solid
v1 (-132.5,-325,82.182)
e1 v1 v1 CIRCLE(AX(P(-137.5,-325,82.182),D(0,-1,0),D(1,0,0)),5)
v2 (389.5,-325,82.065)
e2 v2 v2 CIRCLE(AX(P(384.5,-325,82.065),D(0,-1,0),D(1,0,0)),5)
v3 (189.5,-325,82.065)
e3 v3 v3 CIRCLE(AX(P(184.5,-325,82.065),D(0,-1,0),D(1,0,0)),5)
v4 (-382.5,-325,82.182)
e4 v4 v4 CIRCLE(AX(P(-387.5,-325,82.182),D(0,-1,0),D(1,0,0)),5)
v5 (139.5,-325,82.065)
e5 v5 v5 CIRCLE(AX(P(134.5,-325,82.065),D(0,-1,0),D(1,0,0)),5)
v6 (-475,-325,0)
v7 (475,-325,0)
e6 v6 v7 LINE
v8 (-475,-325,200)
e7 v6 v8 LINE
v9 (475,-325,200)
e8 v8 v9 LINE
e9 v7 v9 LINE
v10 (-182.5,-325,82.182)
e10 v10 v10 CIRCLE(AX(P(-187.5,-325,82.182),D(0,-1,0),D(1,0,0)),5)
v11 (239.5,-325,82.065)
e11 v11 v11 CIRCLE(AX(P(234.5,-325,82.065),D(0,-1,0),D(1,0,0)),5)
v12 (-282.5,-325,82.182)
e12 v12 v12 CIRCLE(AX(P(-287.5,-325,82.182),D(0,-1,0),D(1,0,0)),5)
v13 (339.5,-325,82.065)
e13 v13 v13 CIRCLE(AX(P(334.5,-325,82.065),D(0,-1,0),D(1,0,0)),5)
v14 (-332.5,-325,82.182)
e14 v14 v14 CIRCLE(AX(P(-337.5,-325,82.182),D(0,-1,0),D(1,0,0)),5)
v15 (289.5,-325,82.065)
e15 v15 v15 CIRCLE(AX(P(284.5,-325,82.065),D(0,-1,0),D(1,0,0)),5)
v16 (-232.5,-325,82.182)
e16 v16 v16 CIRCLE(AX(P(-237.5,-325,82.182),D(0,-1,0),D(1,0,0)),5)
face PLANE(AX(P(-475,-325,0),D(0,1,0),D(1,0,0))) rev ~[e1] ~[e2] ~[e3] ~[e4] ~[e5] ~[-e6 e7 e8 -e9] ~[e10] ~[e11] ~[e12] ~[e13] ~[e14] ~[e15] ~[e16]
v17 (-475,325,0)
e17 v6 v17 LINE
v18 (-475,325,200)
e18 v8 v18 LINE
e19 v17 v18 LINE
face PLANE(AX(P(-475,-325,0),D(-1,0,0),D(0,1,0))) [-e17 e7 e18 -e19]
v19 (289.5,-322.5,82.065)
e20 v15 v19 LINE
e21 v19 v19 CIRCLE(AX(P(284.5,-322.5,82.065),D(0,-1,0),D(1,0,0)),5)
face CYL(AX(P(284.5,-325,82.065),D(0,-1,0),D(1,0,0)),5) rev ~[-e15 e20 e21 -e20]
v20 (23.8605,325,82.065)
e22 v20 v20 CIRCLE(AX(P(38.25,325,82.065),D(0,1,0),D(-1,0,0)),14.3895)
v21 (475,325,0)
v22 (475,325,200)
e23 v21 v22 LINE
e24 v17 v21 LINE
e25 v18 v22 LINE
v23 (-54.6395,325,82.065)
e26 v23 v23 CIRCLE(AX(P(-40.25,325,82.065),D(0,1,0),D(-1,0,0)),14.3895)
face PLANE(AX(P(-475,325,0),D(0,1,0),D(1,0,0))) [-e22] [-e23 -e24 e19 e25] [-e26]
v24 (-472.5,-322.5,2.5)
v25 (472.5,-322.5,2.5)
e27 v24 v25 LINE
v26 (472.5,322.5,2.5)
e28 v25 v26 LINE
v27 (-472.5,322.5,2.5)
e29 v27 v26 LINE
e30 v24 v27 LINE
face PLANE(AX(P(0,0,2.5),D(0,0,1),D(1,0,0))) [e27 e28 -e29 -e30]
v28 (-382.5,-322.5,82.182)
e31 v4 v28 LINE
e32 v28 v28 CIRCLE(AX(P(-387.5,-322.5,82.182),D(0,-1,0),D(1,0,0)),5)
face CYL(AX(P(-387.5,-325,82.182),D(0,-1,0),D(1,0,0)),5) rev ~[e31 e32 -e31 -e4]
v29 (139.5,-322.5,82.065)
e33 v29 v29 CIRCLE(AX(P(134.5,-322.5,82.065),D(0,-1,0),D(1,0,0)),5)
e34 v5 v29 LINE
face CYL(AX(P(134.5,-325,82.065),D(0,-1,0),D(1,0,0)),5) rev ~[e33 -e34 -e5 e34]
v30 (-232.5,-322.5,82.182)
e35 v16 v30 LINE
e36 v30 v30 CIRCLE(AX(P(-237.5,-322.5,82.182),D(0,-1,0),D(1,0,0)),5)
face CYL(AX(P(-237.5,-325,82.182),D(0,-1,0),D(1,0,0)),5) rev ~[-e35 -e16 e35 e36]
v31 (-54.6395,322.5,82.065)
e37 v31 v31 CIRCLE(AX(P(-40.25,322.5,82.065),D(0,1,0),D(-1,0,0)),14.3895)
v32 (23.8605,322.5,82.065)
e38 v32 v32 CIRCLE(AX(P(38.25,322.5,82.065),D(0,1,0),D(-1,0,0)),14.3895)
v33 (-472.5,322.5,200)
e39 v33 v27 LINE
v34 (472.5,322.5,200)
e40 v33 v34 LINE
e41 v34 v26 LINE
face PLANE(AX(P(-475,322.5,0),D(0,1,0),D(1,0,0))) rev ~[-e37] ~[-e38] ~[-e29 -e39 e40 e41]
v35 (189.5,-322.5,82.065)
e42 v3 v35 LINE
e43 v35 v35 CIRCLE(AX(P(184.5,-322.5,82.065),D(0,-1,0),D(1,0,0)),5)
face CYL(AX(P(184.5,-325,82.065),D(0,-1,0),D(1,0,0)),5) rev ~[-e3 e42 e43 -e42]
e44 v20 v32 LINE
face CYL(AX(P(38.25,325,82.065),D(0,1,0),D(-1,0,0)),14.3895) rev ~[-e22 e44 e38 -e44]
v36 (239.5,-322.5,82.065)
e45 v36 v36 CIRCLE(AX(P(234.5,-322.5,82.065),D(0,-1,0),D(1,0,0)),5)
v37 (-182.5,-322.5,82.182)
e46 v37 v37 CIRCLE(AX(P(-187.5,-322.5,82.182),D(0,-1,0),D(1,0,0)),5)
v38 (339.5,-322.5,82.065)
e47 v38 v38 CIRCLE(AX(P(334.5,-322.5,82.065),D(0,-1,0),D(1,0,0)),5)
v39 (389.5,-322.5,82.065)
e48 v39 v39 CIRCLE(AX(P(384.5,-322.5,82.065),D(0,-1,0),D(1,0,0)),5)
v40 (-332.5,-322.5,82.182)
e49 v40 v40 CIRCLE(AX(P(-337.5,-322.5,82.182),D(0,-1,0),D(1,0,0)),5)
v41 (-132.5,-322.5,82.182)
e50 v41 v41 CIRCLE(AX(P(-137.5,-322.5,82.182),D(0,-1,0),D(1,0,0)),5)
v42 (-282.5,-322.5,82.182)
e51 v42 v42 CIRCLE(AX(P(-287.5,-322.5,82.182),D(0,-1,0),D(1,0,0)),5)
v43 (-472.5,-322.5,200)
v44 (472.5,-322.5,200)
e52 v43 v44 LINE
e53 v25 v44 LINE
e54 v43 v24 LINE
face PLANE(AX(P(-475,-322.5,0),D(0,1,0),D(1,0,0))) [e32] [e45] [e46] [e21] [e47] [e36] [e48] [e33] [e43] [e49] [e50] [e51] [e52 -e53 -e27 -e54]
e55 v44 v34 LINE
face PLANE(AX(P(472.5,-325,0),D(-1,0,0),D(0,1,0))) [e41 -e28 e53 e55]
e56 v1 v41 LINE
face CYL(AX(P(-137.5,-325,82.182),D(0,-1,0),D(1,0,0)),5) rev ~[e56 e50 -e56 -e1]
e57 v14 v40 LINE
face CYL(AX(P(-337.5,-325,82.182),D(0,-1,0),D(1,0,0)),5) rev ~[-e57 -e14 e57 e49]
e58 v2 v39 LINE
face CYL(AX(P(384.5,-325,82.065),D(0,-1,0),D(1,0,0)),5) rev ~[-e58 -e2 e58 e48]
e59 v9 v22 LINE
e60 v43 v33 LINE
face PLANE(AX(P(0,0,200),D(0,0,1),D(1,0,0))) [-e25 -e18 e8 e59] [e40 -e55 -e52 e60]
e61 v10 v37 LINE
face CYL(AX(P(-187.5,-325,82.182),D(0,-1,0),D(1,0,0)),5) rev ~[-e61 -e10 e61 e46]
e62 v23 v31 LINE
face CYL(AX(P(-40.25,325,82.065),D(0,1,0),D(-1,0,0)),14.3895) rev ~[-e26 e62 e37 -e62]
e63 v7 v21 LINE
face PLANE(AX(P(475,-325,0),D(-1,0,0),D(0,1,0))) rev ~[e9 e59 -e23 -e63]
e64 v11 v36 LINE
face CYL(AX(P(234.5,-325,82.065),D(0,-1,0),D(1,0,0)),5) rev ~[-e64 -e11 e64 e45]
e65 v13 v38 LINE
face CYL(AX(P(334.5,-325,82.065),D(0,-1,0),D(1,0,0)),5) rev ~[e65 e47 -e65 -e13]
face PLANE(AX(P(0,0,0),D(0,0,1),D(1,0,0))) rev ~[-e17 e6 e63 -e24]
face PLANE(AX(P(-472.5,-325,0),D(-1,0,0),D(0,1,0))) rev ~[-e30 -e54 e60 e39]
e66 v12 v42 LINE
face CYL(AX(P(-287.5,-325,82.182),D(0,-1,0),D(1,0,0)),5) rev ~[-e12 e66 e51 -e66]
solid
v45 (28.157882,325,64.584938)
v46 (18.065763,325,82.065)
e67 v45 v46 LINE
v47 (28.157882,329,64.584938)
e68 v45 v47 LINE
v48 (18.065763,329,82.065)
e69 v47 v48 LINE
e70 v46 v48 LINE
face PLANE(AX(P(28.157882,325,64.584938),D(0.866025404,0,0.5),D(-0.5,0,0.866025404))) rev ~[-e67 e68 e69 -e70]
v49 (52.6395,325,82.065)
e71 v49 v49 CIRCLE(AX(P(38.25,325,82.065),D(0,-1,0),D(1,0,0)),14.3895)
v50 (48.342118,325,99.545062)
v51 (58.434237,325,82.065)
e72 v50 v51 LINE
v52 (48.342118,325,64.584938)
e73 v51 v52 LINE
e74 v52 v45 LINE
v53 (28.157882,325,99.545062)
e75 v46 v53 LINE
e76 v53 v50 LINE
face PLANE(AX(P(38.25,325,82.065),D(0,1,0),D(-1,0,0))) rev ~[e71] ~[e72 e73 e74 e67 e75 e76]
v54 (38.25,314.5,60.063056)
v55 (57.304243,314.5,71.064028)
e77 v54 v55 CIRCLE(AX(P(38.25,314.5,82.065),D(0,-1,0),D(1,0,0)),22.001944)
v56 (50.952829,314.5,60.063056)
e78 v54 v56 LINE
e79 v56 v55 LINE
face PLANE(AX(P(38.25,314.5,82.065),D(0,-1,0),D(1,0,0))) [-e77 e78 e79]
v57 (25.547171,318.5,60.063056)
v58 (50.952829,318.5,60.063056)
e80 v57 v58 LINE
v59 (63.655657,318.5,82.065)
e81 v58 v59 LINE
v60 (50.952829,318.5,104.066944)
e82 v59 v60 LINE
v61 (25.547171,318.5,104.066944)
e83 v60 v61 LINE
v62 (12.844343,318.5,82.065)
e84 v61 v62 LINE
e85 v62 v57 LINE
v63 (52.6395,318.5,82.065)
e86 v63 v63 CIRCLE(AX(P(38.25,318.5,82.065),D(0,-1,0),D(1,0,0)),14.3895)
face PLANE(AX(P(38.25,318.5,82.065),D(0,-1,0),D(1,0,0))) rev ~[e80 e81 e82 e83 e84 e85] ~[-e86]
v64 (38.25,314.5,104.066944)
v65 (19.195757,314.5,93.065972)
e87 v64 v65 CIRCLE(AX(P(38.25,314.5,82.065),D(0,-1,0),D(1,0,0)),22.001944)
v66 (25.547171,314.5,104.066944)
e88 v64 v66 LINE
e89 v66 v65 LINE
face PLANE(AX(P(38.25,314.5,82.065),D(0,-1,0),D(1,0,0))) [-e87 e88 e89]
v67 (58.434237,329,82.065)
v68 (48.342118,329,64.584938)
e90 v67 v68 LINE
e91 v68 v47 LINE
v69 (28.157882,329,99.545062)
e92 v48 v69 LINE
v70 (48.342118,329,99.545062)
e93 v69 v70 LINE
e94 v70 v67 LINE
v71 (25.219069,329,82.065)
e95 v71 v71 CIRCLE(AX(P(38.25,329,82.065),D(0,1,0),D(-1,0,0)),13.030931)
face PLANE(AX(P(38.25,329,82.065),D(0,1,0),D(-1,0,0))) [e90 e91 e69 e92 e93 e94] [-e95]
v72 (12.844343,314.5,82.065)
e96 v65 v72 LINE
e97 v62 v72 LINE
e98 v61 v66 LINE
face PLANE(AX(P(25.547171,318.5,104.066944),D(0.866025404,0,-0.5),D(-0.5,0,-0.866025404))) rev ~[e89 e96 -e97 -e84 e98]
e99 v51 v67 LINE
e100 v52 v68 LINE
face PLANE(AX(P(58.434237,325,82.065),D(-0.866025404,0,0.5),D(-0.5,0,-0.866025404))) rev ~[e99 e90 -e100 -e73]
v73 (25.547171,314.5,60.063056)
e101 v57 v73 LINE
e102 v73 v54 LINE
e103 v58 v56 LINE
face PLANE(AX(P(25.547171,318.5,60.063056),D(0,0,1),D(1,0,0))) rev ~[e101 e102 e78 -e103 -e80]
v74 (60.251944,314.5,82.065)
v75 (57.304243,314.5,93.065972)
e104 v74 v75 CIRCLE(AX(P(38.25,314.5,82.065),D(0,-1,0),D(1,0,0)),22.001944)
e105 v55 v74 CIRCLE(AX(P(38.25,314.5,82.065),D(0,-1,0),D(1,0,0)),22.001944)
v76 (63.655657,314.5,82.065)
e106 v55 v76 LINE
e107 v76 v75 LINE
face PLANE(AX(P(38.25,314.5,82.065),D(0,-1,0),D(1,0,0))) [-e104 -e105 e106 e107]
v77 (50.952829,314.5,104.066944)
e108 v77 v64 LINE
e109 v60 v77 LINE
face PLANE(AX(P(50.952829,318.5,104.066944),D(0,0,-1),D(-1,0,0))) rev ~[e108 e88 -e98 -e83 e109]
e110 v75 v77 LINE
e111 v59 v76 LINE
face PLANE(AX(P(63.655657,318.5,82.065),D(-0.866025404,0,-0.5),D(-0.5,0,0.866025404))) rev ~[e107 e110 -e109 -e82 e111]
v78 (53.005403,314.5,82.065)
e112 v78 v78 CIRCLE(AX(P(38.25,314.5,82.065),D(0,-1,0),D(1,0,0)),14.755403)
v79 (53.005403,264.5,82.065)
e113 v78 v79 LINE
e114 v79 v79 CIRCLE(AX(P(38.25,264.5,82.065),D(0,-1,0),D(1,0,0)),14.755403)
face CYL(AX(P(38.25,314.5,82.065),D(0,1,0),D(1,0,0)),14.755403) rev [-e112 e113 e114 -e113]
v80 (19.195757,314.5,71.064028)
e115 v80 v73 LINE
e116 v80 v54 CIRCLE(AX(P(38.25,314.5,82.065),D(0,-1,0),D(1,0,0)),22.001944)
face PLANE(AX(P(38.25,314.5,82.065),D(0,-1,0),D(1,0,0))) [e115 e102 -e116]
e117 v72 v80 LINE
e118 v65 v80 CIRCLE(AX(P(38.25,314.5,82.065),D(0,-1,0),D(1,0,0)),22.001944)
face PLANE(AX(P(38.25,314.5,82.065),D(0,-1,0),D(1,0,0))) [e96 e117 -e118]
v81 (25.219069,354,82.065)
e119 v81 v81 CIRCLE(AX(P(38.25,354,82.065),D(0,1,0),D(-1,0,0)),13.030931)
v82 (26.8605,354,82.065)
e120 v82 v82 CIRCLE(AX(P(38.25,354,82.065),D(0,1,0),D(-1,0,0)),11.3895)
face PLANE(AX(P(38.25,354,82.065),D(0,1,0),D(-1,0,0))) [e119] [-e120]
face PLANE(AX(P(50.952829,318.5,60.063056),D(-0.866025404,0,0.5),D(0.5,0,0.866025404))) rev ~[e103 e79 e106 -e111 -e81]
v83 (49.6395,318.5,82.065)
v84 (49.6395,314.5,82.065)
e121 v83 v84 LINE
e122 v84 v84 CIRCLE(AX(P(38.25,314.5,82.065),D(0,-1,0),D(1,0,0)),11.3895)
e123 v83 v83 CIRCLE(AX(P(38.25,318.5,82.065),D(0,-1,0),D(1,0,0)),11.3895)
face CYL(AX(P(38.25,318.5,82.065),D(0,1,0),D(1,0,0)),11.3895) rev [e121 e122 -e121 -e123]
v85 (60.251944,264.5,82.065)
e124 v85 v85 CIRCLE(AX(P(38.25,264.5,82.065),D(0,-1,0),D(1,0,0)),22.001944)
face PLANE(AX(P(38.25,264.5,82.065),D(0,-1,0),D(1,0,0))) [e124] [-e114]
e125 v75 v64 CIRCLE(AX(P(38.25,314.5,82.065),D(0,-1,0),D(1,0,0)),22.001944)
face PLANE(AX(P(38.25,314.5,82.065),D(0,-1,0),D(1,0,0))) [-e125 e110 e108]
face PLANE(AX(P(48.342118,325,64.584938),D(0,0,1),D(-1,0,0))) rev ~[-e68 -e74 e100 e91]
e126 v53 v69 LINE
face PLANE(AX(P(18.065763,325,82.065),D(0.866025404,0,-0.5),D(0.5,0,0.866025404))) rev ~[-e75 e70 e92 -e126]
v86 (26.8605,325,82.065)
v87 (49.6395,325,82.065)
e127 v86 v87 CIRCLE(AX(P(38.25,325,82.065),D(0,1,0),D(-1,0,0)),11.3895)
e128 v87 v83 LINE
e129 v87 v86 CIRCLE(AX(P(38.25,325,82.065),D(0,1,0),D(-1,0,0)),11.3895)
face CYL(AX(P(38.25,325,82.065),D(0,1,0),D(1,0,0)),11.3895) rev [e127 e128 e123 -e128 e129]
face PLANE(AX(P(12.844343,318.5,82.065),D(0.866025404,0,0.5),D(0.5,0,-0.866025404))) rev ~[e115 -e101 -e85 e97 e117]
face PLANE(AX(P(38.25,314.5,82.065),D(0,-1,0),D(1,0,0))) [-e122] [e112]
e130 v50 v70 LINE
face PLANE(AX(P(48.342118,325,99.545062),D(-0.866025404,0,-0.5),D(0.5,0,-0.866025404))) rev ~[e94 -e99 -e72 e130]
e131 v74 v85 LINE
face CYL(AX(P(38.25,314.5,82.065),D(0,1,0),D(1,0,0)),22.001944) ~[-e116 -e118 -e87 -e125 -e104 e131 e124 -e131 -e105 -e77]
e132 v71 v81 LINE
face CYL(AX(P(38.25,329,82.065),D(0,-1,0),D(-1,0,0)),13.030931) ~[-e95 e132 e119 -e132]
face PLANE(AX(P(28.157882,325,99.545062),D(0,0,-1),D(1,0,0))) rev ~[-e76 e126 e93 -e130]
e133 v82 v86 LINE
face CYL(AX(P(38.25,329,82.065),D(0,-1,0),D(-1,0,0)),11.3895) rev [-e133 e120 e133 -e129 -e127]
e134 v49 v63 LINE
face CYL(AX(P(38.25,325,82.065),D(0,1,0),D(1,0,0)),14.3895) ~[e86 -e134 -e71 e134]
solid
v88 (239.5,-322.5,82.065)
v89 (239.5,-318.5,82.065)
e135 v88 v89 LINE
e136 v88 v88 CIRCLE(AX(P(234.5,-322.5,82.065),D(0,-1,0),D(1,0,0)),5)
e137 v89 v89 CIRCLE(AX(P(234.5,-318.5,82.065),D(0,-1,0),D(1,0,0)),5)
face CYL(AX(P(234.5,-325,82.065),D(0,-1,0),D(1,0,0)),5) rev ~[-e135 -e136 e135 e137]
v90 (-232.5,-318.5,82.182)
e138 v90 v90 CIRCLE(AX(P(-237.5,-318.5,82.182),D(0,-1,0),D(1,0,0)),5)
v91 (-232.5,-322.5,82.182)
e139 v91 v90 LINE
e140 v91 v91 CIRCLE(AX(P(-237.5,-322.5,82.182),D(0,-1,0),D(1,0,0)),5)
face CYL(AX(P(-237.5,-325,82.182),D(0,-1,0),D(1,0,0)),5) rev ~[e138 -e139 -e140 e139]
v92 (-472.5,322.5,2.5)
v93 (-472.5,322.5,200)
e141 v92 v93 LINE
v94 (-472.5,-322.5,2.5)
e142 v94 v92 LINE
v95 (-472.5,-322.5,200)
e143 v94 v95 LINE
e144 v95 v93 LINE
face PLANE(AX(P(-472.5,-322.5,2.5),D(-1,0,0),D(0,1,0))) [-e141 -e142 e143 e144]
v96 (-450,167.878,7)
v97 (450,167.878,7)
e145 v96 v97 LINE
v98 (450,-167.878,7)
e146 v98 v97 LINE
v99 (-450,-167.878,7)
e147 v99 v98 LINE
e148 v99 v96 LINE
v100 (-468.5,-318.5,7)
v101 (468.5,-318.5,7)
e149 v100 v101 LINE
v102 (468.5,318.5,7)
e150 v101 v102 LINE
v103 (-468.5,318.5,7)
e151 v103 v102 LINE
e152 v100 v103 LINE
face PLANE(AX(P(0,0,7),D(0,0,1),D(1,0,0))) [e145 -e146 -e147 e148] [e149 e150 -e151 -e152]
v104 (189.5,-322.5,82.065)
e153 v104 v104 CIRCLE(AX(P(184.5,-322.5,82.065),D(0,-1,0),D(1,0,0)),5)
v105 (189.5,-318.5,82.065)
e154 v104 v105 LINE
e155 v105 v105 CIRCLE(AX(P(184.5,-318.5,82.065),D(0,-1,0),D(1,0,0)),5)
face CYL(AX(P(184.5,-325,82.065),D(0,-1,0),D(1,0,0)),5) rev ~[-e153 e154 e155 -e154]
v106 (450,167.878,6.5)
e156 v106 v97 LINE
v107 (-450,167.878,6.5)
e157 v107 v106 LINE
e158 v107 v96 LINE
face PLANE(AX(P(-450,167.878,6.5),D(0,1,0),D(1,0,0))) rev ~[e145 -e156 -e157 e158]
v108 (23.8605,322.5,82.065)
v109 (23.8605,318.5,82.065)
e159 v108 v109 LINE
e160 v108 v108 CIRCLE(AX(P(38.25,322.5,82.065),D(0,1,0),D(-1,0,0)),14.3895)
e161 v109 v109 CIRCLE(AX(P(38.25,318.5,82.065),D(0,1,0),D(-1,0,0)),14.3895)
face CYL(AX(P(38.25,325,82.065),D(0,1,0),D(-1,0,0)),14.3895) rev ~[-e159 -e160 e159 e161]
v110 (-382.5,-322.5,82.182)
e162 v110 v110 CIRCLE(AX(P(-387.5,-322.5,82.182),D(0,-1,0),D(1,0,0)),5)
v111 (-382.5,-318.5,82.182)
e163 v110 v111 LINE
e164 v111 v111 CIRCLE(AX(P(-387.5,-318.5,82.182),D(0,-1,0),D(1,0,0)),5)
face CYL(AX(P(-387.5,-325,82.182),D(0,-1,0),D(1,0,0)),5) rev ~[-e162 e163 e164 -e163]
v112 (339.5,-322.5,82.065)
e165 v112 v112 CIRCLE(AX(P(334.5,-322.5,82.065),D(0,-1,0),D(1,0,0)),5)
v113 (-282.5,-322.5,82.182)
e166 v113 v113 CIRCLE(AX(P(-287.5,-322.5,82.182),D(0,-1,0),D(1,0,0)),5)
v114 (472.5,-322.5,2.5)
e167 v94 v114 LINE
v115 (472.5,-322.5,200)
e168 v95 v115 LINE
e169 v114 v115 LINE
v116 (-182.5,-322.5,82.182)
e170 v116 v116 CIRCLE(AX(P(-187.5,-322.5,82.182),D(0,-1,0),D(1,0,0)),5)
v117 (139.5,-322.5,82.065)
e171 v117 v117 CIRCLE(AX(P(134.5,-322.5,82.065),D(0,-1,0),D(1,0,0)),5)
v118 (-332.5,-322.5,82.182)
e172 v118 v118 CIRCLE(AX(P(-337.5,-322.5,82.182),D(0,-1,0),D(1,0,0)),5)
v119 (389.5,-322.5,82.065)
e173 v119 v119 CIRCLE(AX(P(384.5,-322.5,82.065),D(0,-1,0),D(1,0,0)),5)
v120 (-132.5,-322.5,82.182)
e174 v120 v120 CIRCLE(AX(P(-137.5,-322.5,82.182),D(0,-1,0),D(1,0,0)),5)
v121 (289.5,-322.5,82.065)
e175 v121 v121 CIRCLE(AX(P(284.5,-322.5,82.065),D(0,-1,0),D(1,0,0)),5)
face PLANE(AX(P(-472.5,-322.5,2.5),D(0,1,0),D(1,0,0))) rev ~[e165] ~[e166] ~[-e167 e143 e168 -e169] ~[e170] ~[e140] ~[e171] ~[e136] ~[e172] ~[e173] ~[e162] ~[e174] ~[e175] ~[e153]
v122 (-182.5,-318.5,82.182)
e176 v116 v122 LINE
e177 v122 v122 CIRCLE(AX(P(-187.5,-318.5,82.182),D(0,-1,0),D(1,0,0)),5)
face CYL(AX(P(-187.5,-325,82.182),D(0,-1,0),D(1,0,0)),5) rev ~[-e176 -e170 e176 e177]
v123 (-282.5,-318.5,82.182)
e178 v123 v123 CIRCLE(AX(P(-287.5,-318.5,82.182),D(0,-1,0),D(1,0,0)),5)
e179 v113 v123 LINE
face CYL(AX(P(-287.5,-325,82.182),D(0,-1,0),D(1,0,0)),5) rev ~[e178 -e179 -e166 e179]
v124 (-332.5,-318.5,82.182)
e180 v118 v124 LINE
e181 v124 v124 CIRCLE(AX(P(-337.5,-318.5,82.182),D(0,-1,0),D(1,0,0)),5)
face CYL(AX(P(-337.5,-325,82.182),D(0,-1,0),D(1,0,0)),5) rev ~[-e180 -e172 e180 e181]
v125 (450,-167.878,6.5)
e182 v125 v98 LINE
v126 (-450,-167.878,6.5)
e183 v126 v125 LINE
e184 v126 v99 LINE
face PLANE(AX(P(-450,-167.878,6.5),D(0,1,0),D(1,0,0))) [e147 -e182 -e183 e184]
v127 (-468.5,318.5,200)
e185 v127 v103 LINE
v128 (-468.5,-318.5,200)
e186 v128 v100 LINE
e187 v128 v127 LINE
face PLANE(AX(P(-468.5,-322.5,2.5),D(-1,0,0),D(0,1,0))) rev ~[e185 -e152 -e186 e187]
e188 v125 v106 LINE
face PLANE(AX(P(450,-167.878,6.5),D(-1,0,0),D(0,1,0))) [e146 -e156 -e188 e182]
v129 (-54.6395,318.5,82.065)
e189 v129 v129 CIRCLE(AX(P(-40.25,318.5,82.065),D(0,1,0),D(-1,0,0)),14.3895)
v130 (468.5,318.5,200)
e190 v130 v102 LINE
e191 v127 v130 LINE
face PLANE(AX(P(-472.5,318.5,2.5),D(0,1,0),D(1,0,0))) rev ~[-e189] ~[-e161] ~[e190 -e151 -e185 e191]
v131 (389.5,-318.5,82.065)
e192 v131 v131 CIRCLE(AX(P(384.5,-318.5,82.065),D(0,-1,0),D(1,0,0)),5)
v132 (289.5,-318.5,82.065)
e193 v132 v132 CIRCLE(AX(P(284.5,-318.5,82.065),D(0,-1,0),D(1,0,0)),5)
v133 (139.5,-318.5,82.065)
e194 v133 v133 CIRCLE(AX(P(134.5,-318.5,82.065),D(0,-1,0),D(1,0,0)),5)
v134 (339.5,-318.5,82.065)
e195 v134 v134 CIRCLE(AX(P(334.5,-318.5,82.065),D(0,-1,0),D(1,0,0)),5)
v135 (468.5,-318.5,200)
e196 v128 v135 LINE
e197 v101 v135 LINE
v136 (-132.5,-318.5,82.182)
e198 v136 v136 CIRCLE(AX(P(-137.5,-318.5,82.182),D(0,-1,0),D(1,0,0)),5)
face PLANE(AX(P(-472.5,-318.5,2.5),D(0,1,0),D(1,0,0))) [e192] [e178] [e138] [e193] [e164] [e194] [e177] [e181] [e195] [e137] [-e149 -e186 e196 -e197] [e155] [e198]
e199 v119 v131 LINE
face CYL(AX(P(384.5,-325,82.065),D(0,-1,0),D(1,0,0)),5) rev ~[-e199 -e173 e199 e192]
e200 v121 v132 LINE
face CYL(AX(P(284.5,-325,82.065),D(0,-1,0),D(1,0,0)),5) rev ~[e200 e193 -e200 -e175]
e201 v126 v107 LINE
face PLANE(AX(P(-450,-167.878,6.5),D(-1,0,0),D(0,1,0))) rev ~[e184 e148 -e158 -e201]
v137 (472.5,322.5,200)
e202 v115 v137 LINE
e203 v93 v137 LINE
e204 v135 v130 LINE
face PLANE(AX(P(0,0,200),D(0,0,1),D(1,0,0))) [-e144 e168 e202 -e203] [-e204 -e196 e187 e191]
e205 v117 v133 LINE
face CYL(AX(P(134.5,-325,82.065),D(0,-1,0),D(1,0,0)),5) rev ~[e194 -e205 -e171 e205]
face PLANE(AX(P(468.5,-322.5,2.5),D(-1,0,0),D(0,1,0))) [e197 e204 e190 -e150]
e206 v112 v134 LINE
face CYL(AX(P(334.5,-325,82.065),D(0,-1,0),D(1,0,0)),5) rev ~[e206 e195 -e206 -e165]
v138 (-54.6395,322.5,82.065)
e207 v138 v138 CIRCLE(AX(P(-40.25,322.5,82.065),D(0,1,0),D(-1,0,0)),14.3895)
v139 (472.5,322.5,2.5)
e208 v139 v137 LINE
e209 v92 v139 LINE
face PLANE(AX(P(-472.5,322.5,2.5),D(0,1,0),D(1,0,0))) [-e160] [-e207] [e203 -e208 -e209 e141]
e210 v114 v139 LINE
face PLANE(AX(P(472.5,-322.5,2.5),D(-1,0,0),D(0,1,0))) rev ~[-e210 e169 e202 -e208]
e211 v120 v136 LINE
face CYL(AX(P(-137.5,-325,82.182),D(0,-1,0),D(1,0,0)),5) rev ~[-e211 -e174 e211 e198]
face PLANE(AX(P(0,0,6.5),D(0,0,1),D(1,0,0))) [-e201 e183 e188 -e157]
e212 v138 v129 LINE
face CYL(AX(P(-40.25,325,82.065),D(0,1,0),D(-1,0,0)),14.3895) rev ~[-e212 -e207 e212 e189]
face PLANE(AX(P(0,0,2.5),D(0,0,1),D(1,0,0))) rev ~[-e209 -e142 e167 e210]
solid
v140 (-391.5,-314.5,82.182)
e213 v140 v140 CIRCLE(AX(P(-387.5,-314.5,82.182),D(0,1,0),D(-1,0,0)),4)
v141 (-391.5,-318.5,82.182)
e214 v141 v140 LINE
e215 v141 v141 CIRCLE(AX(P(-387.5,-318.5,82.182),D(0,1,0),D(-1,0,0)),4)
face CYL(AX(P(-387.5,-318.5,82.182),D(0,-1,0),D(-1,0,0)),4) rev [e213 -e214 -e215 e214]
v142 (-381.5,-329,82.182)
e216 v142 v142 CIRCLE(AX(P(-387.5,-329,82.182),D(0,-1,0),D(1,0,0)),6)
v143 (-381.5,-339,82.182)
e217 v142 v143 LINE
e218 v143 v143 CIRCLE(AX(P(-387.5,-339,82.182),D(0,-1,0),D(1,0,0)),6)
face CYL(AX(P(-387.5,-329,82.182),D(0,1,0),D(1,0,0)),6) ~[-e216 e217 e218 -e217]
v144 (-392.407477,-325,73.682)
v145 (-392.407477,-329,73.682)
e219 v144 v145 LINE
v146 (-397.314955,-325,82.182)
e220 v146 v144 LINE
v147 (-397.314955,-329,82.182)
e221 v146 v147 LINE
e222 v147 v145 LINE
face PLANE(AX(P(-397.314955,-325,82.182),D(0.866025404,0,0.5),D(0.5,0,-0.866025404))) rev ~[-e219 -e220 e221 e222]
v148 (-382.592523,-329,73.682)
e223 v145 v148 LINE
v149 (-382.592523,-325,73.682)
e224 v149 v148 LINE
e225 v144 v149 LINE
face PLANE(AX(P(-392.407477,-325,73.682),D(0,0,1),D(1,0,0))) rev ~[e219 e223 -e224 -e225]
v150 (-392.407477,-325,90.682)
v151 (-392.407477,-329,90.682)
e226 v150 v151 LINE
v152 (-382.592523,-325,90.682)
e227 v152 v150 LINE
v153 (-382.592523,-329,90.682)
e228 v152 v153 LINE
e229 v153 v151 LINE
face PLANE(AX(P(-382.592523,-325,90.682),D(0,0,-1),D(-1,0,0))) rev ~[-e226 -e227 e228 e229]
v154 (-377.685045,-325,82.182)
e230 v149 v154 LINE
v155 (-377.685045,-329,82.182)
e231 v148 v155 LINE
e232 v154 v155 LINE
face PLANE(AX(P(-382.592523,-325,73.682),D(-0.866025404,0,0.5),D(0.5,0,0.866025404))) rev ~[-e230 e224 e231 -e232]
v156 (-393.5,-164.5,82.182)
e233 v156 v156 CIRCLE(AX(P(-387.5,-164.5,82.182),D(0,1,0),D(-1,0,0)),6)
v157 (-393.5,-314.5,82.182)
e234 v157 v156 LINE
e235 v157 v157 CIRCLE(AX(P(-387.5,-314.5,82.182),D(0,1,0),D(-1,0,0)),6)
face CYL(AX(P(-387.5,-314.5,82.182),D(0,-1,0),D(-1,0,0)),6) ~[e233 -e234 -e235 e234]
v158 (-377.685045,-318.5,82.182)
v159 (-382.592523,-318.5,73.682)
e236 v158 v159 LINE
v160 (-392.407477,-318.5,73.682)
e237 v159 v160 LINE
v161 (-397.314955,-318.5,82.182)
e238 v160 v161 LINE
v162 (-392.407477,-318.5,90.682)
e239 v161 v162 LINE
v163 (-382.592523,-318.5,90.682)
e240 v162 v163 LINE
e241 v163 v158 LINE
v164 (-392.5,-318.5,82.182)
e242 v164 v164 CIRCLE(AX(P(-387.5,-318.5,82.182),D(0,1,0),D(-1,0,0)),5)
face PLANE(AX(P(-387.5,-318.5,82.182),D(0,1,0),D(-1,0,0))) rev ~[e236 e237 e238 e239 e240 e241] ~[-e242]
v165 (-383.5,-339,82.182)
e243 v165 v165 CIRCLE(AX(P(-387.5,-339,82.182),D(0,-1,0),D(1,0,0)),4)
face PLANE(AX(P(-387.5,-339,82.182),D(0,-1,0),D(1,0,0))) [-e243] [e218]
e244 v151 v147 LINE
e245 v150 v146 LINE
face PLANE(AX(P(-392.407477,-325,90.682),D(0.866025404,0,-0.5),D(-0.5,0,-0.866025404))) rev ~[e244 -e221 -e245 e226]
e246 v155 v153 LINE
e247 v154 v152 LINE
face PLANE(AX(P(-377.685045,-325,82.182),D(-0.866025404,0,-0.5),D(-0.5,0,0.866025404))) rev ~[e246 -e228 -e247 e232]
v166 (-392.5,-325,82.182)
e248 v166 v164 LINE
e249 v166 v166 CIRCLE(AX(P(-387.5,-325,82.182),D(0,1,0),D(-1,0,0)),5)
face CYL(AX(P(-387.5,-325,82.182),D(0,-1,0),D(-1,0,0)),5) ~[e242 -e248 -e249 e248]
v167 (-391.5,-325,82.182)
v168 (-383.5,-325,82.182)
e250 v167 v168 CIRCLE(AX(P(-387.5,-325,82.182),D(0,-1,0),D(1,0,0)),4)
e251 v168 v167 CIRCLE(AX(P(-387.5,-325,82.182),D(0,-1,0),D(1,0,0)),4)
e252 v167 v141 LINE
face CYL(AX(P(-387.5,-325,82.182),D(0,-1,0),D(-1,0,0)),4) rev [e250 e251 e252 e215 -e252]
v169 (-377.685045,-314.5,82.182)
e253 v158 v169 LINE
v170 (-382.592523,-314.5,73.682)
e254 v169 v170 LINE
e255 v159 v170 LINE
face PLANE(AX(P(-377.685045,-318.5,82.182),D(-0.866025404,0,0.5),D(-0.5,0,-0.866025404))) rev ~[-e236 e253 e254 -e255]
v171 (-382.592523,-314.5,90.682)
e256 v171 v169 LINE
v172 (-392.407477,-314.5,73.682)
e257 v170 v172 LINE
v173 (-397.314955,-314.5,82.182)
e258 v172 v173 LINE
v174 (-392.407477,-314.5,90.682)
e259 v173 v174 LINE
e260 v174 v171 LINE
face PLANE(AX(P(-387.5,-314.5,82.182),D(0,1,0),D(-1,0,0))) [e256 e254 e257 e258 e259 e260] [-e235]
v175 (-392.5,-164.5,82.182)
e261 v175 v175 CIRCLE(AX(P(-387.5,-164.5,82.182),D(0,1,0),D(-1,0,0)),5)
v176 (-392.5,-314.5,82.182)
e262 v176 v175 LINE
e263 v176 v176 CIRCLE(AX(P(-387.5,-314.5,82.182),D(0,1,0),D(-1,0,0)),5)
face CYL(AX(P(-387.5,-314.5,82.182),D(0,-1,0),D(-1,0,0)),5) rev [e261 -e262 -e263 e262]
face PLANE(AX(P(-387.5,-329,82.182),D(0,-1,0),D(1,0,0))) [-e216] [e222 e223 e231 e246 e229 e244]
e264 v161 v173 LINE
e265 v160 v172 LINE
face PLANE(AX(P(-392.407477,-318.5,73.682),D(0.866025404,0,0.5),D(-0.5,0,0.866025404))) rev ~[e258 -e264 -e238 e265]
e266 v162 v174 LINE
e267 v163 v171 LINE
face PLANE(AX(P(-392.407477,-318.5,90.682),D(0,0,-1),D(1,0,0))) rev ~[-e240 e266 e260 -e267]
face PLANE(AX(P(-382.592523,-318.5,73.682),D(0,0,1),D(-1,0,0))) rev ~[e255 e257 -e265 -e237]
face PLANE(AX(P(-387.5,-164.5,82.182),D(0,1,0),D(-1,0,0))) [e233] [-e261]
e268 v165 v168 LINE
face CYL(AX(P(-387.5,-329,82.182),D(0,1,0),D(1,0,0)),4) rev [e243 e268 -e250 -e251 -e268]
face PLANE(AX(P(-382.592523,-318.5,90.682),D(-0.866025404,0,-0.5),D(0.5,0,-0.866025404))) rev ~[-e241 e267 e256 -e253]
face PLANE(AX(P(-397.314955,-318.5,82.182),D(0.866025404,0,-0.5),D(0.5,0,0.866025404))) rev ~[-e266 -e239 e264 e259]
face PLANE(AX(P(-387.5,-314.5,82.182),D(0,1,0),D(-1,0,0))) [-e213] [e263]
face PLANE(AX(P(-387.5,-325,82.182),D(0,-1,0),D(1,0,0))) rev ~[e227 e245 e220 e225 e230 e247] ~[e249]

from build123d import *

# Parameters (mm, degrees)
F0_W      = 950
F0_H      = 650
F1_DEPTH  = 200
F2_T      = -2.5
F3_DEPTH  = 197.5
F4_T      = -4
F5_W      = 937
F5_H      = 637
F5_W_2    = 900
F5_H_2    = 335.756
F6_DEPTH  = 0.5
F7_R      = 5
F8_DEPTH  = 25
F9_R      = 14.3895
F10_DEPTH = 15
F11_R     = 4
F12_DEPTH = 4
F13_R     = 6
F13_R_2   = 4
F14_DEPTH = 10
F15_R     = 5
F15_R_2   = 4
F16_DEPTH = 6.5
F17_R     = 5
F17_R_2   = 4
F18_DEPTH = 4
F19_R     = 6
F19_R_2   = 5
F20_DEPTH = 150
F21_R     = 11.3895
F22_DEPTH = 4
F23_R     = 13.0309314184
F23_R_2   = 11.3895
F24_DEPTH = 25
F25_R     = 14.3895
F25_R_2   = 11.3895
F26_DEPTH = 6.5
F27_R     = 11.3895
F28_DEPTH = 4
F29_R     = 22.0019443752
F29_R_2   = 14.7554030698
F30_DEPTH = 50


# Not quite as in the source:
# - a feature names something its author has since deleted; it is built from what else it names


with BuildPart() as f1:
    # F0 (on Top) → F1 (new body)
    with BuildSketch(Plane.XY):
        Rectangle(F0_W, F0_H)
    extrude(amount=F1_DEPTH)

    # F2
    f2_openings = [f1.faces().sort_by_distance(p)[0] for p in [
        (0, 0, 200),
    ]]
    offset(amount=F2_T, openings=f2_openings)


with BuildPart() as f3:
    # F3 (new): a face of the model
    f3_faces = [f1.part.faces().sort_by_distance(p)[0] for p in [
        (0, 0, 2.5),
    ]]
    extrude(f3_faces, amount=F3_DEPTH)

    # F4
    f4_openings = [f3.faces().sort_by_distance(p)[0] for p in [
        (0, 0, 200),
    ]]
    offset(amount=F4_T, openings=f4_openings)

    # F5 (on face) → F6 (join)
    with BuildSketch(Plane.XY.offset(6.5)):
        Rectangle(F5_W, F5_H)
        Rectangle(F5_W_2, F5_H_2, mode=Mode.SUBTRACT)
    extrude(amount=F6_DEPTH)


with BuildPart() as f8_tool:
    # F7 (on face) → F8 (new body)
    with BuildSketch(Plane.XZ.offset(325)):
        with Locations((-387.5, 82.182)):
            Circle(F7_R)
        with Locations((-337.5, 82.182)):
            Circle(F7_R)
        with Locations((-287.5, 82.182)):
            Circle(F7_R)
        with Locations((-237.5, 82.182)):
            Circle(F7_R)
        with Locations((-187.5, 82.182)):
            Circle(F7_R)
        with Locations((-137.5, 82.182)):
            Circle(F7_R)
        with Locations((384.5, 82.065)):
            Circle(F7_R)
        with Locations((334.5, 82.065)):
            Circle(F7_R)
        with Locations((284.5, 82.065)):
            Circle(F7_R)
        with Locations((234.5, 82.065)):
            Circle(F7_R)
        with Locations((184.5, 82.065)):
            Circle(F7_R)
        with Locations((134.5, 82.065)):
            Circle(F7_R)
    extrude(amount=-F8_DEPTH)


with BuildPart() as f1_1:
    add(f1.part)

    # F8: cut by f8_tool
    add(f8_tool.part, mode=Mode.SUBTRACT)


with BuildPart() as f3_1:
    add(f3.part)

    # F8: cut by f8_tool
    add(f8_tool.part, mode=Mode.SUBTRACT)


with BuildPart() as f10_tool:
    # F9 (on face) → F10 (new body)
    with BuildSketch(Plane(origin=(0, 325, 0), x_dir=(-1, 0, 0), z_dir=(0, 1, 0))):
        with Locations((40.25, 82.065)):
            Circle(F9_R)
        with Locations((-38.25, 82.065)):
            Circle(F9_R)
    extrude(amount=-F10_DEPTH)


with BuildPart() as f1_2:
    add(f1_1.part)

    # F10: cut by f10_tool
    add(f10_tool.part, mode=Mode.SUBTRACT)


with BuildPart() as f3_2:
    add(f3_1.part)

    # F10: cut by f10_tool
    add(f10_tool.part, mode=Mode.SUBTRACT)


with BuildPart() as f12:
    # F11 (on face) → F12 (new body)
    with BuildSketch(Plane.XZ.offset(325)):
        Polygon((-382.5925227119, 90.682), (-392.4074772881, 90.682), (-397.3149545762, 82.182), (-392.4074772881, 73.682), (-382.5925227119, 73.682), (-377.6850454238, 82.182), align=None)
        with Locations((-387.5, 82.182)):
            Circle(F11_R, mode=Mode.SUBTRACT)
    extrude(amount=F12_DEPTH)

    # F13 (on face) → F14 (join)
    with BuildSketch(Plane.XZ.offset(329)):
        with Locations((-387.5, 82.182)):
            Circle(F13_R)
        with Locations((-387.5, 82.182)):
            Circle(F13_R_2, mode=Mode.SUBTRACT)
    extrude(amount=F14_DEPTH)

    # F15 (on face) → F16 (join)
    with BuildSketch(Plane(origin=(0, -325, 0), x_dir=(-1, 0, 0), z_dir=(0, 1, 0))):
        with Locations((387.5, 82.182)):
            Circle(F15_R)
        with Locations((387.5, 82.182)):
            Circle(F15_R_2, mode=Mode.SUBTRACT)
    extrude(amount=F16_DEPTH)

    # F17 (on face) → F18 (join)
    with BuildSketch(Plane(origin=(0, -318.5, 0), x_dir=(-1, 0, 0), z_dir=(0, 1, 0))):
        Polygon((392.4074772881, 90.682), (382.5925227119, 90.682), (377.6850454238, 82.182), (382.5925227119, 73.682), (392.4074772881, 73.682), (397.3149545762, 82.182), align=None)
        with Locations((387.5, 82.182)):
            Circle(F17_R, mode=Mode.SUBTRACT)
        with Locations((387.5, 82.182)):
            Circle(F17_R)
        with Locations((387.5, 82.182)):
            Circle(F17_R_2, mode=Mode.SUBTRACT)
    extrude(amount=F18_DEPTH)

    # F19 (on face) → F20 (join)
    with BuildSketch(Plane(origin=(0, -314.5, 0), x_dir=(-1, 0, 0), z_dir=(0, 1, 0))):
        with Locations((387.5, 82.182)):
            Circle(F19_R)
        with Locations((387.5, 82.182)):
            Circle(F19_R_2, mode=Mode.SUBTRACT)
    extrude(amount=F20_DEPTH)


with BuildPart() as f22:
    # F21 (on face) → F22 (new body)
    with BuildSketch(Plane(origin=(0, 325, 0), x_dir=(-1, 0, 0), z_dir=(0, 1, 0))):
        Polygon((-28.1578817366, 99.5450615883), (-48.3421182634, 99.5450615883), (-58.4342365269, 82.065), (-48.3421182634, 64.5849384117), (-28.1578817366, 64.5849384117), (-18.0657634731, 82.065), align=None)
        with Locations((-38.25, 82.065)):
            Circle(F21_R, mode=Mode.SUBTRACT)
    extrude(amount=F22_DEPTH)

    # F23 (on face) → F24 (join)
    with BuildSketch(Plane(origin=(0, 329, 0), x_dir=(-1, 0, 0), z_dir=(0, 1, 0))):
        with Locations((-38.25, 82.065)):
            Circle(F23_R)
        with Locations((-38.25, 82.065)):
            Circle(F23_R_2, mode=Mode.SUBTRACT)
    extrude(amount=F24_DEPTH)

    # F25 (on face) → F26 (join)
    with BuildSketch(Plane.XZ.offset(-325)):
        with Locations((38.25, 82.065)):
            Circle(F25_R)
        with Locations((38.25, 82.065)):
            Circle(F25_R_2, mode=Mode.SUBTRACT)
    extrude(amount=F26_DEPTH)

    # F27 (on face) → F28 (join)
    with BuildSketch(Plane.XZ.offset(-318.5)):
        Polygon((50.9528285077, 104.0669443752), (25.5471714923, 104.0669443752), (12.8443429845, 82.065), (25.5471714923, 60.0630556248), (50.9528285077, 60.0630556248), (63.6556570155, 82.065), align=None)
        with Locations((38.25, 82.065)):
            Circle(F27_R, mode=Mode.SUBTRACT)
    extrude(amount=F28_DEPTH)

    # F29 (on face) → F30 (join)
    with BuildSketch(Plane.XZ.offset(-314.5)):
        with Locations((38.25, 82.065)):
            Circle(F29_R)
        with Locations((38.25, 82.065)):
            Circle(F29_R_2, mode=Mode.SUBTRACT)
    extrude(amount=F30_DEPTH)


solid = Compound([f1_2.part, f3_2.part, f12.part, f22.part])
